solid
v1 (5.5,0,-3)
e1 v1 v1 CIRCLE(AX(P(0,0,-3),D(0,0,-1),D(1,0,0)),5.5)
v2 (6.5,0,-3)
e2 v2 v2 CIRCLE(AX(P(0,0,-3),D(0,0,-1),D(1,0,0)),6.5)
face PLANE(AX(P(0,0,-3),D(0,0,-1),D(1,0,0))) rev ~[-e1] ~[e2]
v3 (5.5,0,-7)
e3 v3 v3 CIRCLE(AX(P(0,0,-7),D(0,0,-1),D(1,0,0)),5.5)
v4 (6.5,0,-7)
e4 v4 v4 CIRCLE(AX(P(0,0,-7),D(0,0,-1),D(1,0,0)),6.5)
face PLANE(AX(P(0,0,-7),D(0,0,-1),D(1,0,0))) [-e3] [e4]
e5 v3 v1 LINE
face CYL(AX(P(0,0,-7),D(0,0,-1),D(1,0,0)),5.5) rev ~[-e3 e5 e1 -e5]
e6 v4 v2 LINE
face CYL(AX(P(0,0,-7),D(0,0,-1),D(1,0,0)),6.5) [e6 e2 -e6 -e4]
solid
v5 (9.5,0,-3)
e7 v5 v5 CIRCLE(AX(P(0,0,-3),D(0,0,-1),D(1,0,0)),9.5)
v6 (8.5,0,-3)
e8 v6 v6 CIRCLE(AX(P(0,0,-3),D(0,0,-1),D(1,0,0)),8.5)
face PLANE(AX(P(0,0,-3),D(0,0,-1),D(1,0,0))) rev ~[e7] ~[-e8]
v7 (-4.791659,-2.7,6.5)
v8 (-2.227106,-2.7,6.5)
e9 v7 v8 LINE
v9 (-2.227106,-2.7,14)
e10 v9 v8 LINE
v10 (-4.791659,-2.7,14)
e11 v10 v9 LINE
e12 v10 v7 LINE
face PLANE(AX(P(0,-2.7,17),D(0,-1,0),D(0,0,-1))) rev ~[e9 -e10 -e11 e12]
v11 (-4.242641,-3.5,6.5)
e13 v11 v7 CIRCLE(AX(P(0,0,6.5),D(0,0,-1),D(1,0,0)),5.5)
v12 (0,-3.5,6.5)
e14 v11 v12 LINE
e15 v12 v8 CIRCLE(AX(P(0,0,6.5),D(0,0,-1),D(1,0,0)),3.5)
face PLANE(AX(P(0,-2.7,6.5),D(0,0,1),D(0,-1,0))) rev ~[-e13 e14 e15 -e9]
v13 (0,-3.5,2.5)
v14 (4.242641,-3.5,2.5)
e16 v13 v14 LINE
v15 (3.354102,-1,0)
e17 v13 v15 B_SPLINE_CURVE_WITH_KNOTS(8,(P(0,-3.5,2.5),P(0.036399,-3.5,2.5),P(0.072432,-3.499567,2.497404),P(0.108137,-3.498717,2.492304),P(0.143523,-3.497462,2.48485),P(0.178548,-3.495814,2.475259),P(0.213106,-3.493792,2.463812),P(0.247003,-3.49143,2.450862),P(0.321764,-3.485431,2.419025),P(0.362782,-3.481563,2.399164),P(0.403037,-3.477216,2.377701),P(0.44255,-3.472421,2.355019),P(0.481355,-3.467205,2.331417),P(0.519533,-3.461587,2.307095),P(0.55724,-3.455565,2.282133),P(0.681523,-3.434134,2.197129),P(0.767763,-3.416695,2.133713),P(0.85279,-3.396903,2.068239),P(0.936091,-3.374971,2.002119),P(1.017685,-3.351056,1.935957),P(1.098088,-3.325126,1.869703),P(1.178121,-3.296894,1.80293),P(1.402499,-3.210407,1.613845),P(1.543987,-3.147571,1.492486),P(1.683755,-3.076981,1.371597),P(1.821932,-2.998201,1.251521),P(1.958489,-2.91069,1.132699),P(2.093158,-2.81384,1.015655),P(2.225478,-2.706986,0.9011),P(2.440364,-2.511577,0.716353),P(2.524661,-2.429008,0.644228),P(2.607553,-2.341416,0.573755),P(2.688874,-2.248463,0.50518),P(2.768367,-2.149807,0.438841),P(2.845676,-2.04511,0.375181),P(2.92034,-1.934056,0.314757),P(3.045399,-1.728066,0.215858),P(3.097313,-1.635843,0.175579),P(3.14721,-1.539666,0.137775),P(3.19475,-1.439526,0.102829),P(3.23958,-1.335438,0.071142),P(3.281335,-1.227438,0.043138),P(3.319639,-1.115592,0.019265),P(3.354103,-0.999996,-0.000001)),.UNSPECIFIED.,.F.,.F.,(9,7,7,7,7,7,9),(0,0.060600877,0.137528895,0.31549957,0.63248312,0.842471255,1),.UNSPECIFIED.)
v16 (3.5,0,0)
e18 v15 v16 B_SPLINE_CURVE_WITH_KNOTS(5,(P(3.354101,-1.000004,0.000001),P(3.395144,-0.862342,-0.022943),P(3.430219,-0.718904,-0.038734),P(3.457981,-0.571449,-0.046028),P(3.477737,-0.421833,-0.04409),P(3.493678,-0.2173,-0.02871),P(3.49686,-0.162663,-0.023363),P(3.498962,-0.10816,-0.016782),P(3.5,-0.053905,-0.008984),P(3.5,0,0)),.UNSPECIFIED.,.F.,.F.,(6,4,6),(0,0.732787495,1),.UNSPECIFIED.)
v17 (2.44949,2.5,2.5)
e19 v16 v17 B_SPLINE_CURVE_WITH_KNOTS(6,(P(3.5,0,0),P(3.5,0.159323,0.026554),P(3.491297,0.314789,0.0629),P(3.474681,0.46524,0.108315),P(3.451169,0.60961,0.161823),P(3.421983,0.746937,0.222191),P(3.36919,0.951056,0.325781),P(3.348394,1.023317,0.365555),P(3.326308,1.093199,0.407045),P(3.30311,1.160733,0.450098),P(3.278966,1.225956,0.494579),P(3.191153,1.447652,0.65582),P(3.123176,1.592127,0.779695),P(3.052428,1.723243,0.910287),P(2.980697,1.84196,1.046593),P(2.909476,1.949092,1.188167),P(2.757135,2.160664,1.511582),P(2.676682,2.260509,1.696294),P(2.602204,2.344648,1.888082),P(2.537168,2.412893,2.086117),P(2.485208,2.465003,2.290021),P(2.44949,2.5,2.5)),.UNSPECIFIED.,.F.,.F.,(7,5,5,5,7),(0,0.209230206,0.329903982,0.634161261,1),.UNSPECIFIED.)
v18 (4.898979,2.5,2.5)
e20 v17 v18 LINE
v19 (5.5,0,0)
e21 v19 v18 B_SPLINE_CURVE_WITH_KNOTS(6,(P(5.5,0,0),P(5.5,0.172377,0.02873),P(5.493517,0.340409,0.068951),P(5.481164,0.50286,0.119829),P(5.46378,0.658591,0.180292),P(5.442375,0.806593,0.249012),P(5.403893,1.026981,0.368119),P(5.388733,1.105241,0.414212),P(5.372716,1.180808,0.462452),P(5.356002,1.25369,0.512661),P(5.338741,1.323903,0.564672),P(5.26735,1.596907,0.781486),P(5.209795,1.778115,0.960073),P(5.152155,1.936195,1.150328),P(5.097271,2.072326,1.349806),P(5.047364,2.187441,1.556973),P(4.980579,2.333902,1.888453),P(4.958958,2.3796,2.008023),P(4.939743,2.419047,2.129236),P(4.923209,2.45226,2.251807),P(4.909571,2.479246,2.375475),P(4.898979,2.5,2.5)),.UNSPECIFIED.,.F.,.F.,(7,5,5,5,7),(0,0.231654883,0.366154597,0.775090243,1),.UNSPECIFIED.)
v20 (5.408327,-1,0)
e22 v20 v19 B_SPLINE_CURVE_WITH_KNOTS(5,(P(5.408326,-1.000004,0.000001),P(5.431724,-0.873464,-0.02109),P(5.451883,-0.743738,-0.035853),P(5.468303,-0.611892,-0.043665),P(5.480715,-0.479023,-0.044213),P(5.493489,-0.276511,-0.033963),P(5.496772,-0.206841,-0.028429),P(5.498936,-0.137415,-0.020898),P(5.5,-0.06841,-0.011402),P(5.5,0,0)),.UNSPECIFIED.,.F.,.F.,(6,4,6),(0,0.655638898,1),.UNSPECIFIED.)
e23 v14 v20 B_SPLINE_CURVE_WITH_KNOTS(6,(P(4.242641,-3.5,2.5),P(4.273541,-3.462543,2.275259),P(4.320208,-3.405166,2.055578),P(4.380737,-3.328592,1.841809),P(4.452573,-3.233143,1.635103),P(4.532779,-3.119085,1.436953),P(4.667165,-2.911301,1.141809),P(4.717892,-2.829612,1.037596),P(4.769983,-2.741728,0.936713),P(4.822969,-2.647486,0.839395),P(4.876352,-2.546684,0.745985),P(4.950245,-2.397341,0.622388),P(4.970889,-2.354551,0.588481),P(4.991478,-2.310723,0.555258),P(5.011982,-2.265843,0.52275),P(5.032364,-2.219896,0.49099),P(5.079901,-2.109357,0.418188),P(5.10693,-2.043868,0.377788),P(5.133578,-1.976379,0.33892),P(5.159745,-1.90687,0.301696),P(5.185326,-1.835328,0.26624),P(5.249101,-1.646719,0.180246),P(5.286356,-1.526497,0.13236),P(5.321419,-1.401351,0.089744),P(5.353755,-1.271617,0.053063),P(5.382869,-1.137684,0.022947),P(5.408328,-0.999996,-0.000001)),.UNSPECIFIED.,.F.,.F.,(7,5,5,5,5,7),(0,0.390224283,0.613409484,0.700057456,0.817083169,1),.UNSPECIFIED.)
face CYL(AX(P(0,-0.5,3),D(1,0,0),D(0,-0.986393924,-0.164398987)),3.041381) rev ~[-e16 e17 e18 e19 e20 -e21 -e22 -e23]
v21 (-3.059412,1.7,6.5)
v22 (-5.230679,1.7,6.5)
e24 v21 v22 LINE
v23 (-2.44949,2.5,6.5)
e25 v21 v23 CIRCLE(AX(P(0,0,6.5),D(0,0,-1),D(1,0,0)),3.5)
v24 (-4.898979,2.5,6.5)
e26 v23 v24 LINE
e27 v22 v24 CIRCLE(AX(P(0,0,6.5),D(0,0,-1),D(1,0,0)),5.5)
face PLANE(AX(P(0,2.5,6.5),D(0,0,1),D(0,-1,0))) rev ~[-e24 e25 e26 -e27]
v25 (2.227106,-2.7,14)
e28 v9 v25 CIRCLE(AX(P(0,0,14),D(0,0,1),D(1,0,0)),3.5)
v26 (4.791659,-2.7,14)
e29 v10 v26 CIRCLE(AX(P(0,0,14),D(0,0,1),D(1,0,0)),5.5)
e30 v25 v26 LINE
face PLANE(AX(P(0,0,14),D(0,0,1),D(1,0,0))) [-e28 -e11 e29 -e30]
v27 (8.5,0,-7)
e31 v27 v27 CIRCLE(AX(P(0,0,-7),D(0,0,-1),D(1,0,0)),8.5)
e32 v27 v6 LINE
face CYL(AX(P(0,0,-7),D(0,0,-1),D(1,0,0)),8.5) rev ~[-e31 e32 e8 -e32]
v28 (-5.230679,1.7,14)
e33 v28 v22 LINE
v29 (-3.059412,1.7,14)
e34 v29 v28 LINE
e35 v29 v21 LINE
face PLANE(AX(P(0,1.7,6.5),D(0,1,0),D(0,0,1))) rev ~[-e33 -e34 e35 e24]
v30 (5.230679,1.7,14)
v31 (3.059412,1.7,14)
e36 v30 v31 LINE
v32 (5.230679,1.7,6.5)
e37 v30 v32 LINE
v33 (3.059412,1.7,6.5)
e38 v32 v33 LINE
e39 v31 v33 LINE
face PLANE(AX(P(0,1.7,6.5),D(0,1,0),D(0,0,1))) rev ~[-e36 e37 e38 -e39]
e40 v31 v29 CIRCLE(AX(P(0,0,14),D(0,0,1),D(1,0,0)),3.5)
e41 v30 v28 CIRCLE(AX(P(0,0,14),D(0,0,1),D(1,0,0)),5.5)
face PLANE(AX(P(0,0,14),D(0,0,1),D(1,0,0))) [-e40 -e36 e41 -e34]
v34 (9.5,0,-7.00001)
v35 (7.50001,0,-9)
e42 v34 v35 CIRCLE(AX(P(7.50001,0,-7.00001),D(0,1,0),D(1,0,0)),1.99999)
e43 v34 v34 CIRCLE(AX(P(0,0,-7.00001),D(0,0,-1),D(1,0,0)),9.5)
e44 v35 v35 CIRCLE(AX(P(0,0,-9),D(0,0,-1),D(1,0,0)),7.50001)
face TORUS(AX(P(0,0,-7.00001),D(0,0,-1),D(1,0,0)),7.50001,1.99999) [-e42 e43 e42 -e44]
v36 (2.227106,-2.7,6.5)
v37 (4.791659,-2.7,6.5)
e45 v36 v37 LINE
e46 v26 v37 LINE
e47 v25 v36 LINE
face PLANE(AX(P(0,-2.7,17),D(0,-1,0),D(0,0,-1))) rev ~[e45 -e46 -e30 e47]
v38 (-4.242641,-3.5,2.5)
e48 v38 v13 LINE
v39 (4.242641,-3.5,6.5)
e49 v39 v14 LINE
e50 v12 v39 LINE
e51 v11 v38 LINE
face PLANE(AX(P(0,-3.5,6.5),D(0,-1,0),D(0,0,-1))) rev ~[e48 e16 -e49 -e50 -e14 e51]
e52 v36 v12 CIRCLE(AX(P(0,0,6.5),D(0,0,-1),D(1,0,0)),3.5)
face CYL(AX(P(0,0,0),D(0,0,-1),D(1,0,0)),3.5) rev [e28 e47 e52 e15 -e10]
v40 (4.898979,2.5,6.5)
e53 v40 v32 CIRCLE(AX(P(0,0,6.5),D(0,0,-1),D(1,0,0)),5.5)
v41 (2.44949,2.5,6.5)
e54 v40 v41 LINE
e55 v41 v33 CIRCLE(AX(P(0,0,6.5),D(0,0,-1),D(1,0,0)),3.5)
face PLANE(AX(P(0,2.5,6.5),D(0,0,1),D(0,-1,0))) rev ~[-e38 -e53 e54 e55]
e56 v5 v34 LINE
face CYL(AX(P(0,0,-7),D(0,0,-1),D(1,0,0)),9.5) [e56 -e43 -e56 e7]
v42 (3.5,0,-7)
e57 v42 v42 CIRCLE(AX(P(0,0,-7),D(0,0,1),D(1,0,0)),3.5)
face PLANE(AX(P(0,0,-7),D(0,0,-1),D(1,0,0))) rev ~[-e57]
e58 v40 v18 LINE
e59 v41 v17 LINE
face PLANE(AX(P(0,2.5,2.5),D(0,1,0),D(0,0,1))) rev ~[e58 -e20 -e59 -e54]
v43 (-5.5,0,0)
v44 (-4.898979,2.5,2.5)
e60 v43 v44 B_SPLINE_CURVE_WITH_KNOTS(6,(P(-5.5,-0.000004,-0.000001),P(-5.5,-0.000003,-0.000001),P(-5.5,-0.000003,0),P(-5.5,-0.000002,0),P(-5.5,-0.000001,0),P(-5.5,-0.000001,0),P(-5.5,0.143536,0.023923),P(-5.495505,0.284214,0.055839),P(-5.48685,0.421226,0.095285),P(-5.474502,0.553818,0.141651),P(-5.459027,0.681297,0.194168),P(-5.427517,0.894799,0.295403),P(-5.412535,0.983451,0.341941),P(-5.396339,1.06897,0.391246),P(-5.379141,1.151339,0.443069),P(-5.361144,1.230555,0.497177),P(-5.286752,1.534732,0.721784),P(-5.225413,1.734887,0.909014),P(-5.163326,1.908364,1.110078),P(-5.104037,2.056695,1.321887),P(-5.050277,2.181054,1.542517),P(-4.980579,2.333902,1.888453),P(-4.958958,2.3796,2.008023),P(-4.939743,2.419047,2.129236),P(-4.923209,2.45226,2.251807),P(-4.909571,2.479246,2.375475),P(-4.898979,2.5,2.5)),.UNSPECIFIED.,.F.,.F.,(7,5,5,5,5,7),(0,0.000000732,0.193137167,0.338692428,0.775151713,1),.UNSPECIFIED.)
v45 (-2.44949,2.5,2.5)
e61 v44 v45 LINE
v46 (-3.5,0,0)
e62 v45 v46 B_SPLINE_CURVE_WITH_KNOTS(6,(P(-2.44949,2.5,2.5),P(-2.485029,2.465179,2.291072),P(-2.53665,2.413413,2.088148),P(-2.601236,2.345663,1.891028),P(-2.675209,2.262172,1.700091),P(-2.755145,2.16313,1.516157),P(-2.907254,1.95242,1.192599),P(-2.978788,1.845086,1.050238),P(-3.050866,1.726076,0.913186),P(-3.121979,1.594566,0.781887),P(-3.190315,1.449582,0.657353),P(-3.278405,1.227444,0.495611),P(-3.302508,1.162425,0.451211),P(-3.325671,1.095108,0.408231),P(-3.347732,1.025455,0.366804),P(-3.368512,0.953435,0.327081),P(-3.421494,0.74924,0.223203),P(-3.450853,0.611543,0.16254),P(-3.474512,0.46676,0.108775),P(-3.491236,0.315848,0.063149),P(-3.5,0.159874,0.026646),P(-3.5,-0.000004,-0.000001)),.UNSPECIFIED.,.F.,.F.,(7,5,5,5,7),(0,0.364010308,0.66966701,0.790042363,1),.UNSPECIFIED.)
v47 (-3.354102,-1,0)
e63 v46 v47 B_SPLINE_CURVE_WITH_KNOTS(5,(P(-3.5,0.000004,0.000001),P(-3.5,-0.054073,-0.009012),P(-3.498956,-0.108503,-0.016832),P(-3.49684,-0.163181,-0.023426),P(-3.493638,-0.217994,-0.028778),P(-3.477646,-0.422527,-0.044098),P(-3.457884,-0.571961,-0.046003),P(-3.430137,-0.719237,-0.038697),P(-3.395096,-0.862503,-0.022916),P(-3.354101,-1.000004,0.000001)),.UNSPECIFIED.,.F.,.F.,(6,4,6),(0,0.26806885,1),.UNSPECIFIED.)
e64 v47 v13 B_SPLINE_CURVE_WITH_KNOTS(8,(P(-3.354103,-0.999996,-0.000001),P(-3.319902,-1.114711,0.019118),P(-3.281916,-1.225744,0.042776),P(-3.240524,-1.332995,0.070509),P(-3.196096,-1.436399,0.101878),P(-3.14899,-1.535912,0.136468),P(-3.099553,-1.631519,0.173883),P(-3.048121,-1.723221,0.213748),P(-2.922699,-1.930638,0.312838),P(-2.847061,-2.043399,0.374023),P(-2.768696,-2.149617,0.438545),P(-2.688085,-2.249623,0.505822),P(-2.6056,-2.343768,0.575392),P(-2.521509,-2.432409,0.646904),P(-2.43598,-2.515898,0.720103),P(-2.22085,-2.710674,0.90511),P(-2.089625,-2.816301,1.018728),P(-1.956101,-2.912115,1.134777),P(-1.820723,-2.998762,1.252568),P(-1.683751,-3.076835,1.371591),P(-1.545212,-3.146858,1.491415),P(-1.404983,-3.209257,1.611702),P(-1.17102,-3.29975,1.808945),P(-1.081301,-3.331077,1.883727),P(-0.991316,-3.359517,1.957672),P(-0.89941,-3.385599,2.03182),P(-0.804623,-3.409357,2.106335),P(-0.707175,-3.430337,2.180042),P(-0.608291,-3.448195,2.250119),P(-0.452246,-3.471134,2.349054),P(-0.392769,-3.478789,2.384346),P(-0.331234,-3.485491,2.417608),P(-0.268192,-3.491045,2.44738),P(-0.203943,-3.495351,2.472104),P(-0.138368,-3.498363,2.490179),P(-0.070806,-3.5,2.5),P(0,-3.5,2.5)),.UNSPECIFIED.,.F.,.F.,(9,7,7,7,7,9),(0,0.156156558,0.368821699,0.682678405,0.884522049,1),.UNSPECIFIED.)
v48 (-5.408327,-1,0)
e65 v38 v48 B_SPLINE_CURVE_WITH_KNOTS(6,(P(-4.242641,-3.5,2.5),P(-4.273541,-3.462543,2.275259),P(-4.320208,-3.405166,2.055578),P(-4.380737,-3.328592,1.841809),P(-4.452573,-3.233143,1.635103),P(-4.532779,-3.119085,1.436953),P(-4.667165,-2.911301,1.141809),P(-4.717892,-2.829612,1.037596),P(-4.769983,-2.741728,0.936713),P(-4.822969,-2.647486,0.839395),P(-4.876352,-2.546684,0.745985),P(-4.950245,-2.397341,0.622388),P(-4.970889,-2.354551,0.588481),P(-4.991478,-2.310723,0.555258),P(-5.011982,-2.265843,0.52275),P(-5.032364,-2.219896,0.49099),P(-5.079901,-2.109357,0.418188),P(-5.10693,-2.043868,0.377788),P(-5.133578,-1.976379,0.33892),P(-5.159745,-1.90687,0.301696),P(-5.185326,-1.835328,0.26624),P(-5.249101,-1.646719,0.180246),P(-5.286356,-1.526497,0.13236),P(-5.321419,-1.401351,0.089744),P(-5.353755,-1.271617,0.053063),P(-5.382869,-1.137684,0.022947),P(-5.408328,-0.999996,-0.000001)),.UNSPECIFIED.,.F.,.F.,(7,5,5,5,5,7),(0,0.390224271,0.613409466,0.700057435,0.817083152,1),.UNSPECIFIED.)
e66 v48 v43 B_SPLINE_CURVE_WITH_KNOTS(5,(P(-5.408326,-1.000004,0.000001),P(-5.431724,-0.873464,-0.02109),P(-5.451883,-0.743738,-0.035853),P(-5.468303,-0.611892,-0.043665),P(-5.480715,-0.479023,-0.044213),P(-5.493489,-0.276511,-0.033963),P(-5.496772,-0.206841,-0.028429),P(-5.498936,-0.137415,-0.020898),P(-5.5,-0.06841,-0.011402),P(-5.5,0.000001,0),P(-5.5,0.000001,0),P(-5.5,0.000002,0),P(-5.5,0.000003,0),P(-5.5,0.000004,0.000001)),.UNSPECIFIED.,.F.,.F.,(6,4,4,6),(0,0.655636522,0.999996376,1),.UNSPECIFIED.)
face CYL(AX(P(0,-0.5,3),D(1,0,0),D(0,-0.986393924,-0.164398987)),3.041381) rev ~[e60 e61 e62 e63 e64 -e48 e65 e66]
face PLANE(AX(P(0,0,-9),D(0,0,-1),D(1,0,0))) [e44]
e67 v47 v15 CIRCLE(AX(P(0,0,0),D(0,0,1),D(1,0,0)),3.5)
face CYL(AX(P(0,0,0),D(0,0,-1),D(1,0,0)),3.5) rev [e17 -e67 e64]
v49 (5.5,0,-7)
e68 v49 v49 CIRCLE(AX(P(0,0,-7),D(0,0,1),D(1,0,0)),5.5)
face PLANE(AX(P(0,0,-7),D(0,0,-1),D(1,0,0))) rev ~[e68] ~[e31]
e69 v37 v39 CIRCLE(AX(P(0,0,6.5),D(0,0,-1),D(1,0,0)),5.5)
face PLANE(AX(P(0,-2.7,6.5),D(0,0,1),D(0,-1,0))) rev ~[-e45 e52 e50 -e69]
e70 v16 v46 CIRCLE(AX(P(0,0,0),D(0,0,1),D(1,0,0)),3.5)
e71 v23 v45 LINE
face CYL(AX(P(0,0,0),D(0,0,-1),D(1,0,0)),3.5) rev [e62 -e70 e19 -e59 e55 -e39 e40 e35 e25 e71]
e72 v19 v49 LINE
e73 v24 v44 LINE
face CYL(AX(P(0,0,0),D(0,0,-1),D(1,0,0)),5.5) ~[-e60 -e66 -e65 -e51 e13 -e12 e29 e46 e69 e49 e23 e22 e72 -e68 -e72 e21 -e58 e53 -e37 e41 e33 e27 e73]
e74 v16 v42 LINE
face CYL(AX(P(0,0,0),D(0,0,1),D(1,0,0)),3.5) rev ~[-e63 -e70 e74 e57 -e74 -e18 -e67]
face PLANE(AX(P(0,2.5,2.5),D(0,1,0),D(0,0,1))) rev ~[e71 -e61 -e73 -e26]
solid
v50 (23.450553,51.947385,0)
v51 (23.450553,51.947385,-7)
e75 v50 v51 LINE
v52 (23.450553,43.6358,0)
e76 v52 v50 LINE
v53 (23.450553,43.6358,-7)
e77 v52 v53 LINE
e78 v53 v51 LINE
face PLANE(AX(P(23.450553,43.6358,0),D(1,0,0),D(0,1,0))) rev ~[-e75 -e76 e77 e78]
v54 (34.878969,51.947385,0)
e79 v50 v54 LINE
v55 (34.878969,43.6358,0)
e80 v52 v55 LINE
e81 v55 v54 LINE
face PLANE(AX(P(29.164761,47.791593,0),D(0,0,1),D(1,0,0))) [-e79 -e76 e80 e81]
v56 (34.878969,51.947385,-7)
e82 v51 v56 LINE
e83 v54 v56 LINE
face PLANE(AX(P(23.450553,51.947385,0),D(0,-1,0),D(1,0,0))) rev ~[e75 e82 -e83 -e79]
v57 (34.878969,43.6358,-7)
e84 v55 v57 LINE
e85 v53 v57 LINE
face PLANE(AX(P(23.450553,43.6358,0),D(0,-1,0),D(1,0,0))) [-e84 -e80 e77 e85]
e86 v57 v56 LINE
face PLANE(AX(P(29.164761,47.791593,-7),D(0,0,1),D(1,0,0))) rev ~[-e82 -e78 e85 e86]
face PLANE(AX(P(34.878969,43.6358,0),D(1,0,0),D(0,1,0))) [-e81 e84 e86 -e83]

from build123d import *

# Parameters (mm, degrees)
F1_W      = 11.4284157753
F1_H      = 8.3115845919
F2_DEPTH  = 7
F4_R      = 9.5
F4_R_2    = 6.5
F4_R_3    = 5.5
F5_DEPTH  = 2
F0_R      = 5.5
F0_R_2    = 3.5
F6_DEPTH  = 7
F7_DEPTH  = 14
F8_DEPTH  = 12.5
F9_R      = 1.99999
F10_R     = 9.5
F10_R_2   = 8.5
F11_DEPTH = 4
F12_DEPTH = 4


# Not quite as in the source:
# - a fillet or chamfer is up to 0.001 mm smaller than in the source, because OpenCascade refuses the exact size


with BuildPart() as f2:
    # F1 (on Top) → F2 (new body)
    with BuildSketch(Plane.XY):
        with Locations((29.1647613049, 47.7915927768)):
            Rectangle(F1_W, F1_H)
    extrude(amount=-F2_DEPTH)


with BuildPart() as f5:
    # F4 (on face) → F5 (new body)
    with BuildSketch(Plane(origin=(0, 0, -7), x_dir=(1, 0, 0), z_dir=(0, 0, -1))):
        Circle(F4_R)
        Circle(F4_R_2, mode=Mode.SUBTRACT)
        Circle(F4_R_2)
        Circle(F4_R_3, mode=Mode.SUBTRACT)
        Circle(F4_R_3)
    extrude(amount=F5_DEPTH)

    # F0 (on Top) → F6 (join)
    with BuildSketch(Plane.XY):
        Circle(F0_R)
        Circle(F0_R_2, mode=Mode.SUBTRACT)
    extrude(amount=-F6_DEPTH)

    # F7 (add): a face of the model
    f7_faces = [f5.faces().sort_by_distance(p)[0] for p in [
        (-5.3444365081, 0, 0),
    ]]
    extrude(f7_faces, amount=F7_DEPTH)

    # F3 (on Right) → F8 (cut, symmetric)
    with BuildSketch(Plane.YZ):
        with BuildLine():
            Line((1.7, 17), (-2.7, 17))
            Line((-2.7, 17), (-2.7, 6.5))
            Line((-2.7, 6.5), (-3.5, 6.5))
            Line((-3.5, 6.5), (-3.5, 2.5))
            ThreePointArc((-3.5, 2.5), (-0.5, -0.0413812651), (2.5, 2.5))
            Line((2.5, 2.5), (2.5, 6.5))
            Line((2.5, 6.5), (1.7, 6.5))
            Line((1.7, 6.5), (1.7, 17))
        make_face()
    extrude(amount=F8_DEPTH, both=True, mode=Mode.SUBTRACT)

    # F9 (radius 2 in the source; OpenCascade refuses exactly that, so slightly less here)
    f9_edges = [f5.edges().sort_by_distance(p)[0] for p in [
        (-9.5, 0, -9),
    ]]
    fillet(f9_edges, radius=F9_R)

    # F10 (on face) → F11 (join)
    with BuildSketch(Plane(origin=(0, 0, -7), x_dir=(1, 0, 0), z_dir=(0, 0, -1))):
        Circle(F10_R)
        Circle(F10_R_2, mode=Mode.SUBTRACT)
    extrude(amount=-F11_DEPTH)


with BuildPart() as f12:
    # F4 (on face) → F12 (new body)
    with BuildSketch(Plane(origin=(0, 0, -7), x_dir=(1, 0, 0), z_dir=(0, 0, -1))):
        Circle(F4_R_2)
        Circle(F4_R_3, mode=Mode.SUBTRACT)
    extrude(amount=-F12_DEPTH)


solid = Compound([f2.part, f5.part, f12.part])
